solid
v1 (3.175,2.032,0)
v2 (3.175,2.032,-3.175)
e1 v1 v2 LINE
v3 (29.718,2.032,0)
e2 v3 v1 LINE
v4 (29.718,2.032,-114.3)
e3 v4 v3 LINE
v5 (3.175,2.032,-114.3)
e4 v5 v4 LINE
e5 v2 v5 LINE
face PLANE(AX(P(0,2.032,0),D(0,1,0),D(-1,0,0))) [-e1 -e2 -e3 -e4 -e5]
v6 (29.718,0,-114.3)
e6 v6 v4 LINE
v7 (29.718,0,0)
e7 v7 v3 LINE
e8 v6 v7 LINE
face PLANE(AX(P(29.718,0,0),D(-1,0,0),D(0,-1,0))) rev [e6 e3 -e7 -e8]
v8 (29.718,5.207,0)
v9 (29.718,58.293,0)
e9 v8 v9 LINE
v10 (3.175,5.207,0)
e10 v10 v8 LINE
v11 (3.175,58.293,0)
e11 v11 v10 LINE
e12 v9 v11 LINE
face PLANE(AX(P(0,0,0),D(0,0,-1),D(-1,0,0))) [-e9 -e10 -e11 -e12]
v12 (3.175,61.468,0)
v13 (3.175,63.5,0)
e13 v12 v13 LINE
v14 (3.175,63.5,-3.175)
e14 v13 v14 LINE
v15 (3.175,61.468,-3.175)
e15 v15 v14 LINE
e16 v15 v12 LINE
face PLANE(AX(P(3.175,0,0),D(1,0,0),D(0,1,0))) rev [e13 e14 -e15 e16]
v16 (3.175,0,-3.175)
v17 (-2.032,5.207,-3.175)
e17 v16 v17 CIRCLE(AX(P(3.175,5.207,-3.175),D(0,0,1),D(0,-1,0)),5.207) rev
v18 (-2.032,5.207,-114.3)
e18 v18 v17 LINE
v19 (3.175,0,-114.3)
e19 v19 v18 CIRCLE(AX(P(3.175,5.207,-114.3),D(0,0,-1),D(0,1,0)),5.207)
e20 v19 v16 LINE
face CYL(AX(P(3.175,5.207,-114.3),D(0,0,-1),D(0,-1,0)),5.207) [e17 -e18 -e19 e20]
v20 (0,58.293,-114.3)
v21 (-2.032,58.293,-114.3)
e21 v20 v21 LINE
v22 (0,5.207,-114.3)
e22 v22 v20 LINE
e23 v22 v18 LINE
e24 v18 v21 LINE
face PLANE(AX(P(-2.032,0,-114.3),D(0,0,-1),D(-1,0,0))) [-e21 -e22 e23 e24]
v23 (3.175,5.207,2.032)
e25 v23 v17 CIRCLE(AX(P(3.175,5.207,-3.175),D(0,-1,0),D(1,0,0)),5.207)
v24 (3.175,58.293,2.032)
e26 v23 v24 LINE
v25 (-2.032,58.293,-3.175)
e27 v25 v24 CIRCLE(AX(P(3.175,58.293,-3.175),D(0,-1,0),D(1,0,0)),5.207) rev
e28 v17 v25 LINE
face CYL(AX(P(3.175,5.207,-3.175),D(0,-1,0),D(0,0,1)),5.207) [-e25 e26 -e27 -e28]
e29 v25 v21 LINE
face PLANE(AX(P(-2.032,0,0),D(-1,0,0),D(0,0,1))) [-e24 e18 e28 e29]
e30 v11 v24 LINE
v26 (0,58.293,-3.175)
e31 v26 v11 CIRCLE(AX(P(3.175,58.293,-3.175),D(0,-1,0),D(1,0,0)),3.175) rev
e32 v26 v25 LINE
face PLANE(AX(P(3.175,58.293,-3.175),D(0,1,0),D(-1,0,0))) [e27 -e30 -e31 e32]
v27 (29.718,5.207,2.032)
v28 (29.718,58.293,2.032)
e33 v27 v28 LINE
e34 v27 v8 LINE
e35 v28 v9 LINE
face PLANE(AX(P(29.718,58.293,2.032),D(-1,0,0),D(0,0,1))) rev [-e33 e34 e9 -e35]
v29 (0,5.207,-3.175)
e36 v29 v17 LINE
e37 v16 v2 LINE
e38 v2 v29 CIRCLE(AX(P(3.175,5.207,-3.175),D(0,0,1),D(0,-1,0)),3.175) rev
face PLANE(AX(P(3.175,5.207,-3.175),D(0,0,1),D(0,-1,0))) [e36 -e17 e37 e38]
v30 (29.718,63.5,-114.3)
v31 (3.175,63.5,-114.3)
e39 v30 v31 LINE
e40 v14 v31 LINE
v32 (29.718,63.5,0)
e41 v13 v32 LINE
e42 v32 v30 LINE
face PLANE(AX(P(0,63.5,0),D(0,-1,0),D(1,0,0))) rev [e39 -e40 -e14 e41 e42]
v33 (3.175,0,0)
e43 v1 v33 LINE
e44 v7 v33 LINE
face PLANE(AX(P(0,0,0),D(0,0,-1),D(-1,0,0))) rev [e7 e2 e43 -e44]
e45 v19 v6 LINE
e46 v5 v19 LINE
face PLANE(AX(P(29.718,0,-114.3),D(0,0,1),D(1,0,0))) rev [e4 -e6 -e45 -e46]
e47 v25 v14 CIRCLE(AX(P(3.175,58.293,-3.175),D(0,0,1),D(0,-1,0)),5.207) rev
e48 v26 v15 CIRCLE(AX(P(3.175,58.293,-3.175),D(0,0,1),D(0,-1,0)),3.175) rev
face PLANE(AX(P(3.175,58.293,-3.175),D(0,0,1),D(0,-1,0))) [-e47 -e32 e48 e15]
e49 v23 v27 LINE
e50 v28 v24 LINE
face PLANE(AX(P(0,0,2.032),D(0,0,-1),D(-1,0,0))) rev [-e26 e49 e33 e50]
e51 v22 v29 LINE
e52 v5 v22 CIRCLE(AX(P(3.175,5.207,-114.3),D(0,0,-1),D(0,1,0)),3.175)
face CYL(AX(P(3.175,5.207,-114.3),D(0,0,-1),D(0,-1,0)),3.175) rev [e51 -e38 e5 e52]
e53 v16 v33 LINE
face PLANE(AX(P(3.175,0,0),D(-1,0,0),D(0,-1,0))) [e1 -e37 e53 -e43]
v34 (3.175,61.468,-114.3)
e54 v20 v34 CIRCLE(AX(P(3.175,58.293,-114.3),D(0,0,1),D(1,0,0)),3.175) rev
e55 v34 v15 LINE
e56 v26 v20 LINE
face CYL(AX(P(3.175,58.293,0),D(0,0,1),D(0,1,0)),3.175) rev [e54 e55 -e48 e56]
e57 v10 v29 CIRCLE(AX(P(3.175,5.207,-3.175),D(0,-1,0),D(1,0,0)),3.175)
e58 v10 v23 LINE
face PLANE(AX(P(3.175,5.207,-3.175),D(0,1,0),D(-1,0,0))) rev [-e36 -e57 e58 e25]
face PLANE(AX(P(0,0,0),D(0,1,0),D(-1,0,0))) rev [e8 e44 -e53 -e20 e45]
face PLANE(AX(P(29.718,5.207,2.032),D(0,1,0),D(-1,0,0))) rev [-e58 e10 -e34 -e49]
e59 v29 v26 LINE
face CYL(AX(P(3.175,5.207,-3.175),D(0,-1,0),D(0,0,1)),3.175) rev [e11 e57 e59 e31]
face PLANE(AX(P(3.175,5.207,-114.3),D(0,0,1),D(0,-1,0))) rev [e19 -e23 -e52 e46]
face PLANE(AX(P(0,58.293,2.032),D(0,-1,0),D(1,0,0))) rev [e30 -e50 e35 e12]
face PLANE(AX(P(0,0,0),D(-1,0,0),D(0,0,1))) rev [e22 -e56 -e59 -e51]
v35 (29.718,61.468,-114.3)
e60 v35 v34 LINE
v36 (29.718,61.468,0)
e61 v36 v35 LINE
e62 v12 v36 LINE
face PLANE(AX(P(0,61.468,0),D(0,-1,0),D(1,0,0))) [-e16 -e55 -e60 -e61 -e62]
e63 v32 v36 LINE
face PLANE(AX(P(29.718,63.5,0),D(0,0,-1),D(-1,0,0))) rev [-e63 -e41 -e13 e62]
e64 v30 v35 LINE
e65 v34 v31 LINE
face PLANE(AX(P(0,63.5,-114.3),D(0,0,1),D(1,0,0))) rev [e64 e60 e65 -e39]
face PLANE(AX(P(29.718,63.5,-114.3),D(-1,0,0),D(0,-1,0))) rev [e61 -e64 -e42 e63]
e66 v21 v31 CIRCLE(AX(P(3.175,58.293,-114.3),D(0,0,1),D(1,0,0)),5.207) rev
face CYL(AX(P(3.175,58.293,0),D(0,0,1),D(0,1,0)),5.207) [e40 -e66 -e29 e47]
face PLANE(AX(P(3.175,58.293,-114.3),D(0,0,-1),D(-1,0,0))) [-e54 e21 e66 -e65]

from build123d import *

# Parameters (mm, degrees)
SKETCH1_W                      = 114.3
SKETCH1_H                      = 63.5
BASE_FLANGE1_DEPTH             = 2.032
EDGE_FLANGE1_STRIP_W           = 14.478
EDGE_FLANGE1_STRIP_H           = 2.032
EDGE_FLANGE1_STRIP_CUT_DEPTH   = 114.3
EDGE_FLANGE1_STRIP_2_W         = 14.478
EDGE_FLANGE1_STRIP_2_H         = 2.032
EDGE_FLANGE1_STRIP_CUT_2_DEPTH = 114.3
EDGE_FLANGE1_DEPTH             = 114.3
EDGE_FLANGE1_BEND_DEPTH        = 114.3
EDGE_FLANGE2_DEPTH             = 63.5
EDGE_FLANGE2_2_DEPTH           = 5.207
EDGE_FLANGE2_START             = 58.293
EDGE_FLANGE2_3_DEPTH           = 5.207
EDGE_FLANGE2_START_2           = 5.207
EDGE_FLANGE2_4_DEPTH           = 53.086


# Read off the part's stored shape, not the designer's step: Edge-Flange2
# Sheet-metal steps are written as plain solids
with BuildPart() as part:
    # Sketch1 → Base-Flange1 (new body)
    with BuildSketch(Plane(origin=(0, 0, 0), x_dir=(0, 0, -1), z_dir=(1, 0, 0))):
        with Locations((57.15, 31.75)):
            Rectangle(SKETCH1_W, SKETCH1_H)
    extrude(amount=-BASE_FLANGE1_DEPTH)

    # Edge-Flange1 strip (across the edge) → Edge-Flange1 strip cut (cut)
    with BuildSketch(Plane(origin=(0, 63.5, -114.3), x_dir=(0, -1, 0), z_dir=(0, 0, 1))):
        with Locations((-2.032, -1.016)):
            Rectangle(EDGE_FLANGE1_STRIP_W, EDGE_FLANGE1_STRIP_H)
    extrude(amount=EDGE_FLANGE1_STRIP_CUT_DEPTH, mode=Mode.SUBTRACT)

    # Edge-Flange1 strip 2 (across the edge) → Edge-Flange1 strip cut 2 (cut)
    with BuildSketch(Plane.YX):
        with Locations((-2.032, -1.016)):
            Rectangle(EDGE_FLANGE1_STRIP_2_W, EDGE_FLANGE1_STRIP_2_H)
    extrude(amount=EDGE_FLANGE1_STRIP_CUT_2_DEPTH, mode=Mode.SUBTRACT)

    # Edge-Flange1 section (across the edge) → Edge-Flange1 (add)
    with BuildSketch(Plane(origin=(0, 63.5, -114.3), x_dir=(0, -1, 0), z_dir=(0, 0, 1))):
        with BuildLine():
            Line((0, 3.175), (0, 29.718))
            Line((0, 29.718), (2.032, 29.718))
            Line((2.032, 29.718), (2.032, 3.175))
            ThreePointArc((2.032, 3.175), (2.96193597, 0.92993597), (5.207, 0))
            Line((5.207, 0), (5.207, -2.032))
            ThreePointArc((5.207, -2.032), (1.52509499, -0.50690501), (0, 3.175))
        make_face()
    extrude(amount=EDGE_FLANGE1_DEPTH)

    # Edge-Flange1 section 2 (across the edge) → Edge-Flange1 bend (add)
    with BuildSketch(Plane.YX):
        with BuildLine():
            Line((0, 3.175), (0, 29.718))
            Line((0, 29.718), (2.032, 29.718))
            Line((2.032, 29.718), (2.032, 3.175))
            ThreePointArc((2.032, 3.175), (2.96193597, 0.92993597), (5.207, 0))
            Line((5.207, 0), (5.207, -2.032))
            ThreePointArc((5.207, -2.032), (1.52509499, -0.50690501), (0, 3.175))
        make_face()
    extrude(amount=EDGE_FLANGE1_BEND_DEPTH)

    # Edge-Flange2 outline → Edge-Flange2 (cut)
    with BuildSketch(Plane(origin=(0, 0, 0), x_dir=(1, 0, 0), z_dir=(0, 1, 0))):
        with BuildLine():
            Line((3.175, 0), (3.175, 3.175))
            Line((3.175, 3.175), (0, 3.175))
            ThreePointArc((0, 3.175), (0.92993597, 0.92993597), (3.175, 0))
        make_face()
        with BuildLine():
            ThreePointArc((-0.95201151, 0), (-1.754614485, 1.498172628), (-2.032, 3.175))
            Line((-2.032, 3.175), (-2.032, 0))
            Line((-2.032, 0), (-0.95201151, 0))
        make_face()
    extrude(amount=EDGE_FLANGE2_DEPTH, mode=Mode.SUBTRACT)

    # Edge-Flange2 2 outline → Edge-Flange2 2 (cut)
    with BuildSketch(Plane(origin=(0, 0, 0), x_dir=(1, 0, 0), z_dir=(0, 1, 0))):
        with BuildLine():
            ThreePointArc((3.175, 0), (0.92993597, 0.92993597), (0, 3.175))
            Line((0, 3.175), (-2.032, 3.175))
            ThreePointArc((-2.032, 3.175), (-1.754614485, 1.498172628), (-0.95201151, 0))
            Line((-0.95201151, 0), (3.175, 0))
        make_face()
    extrude(amount=EDGE_FLANGE2_2_DEPTH, mode=Mode.SUBTRACT)

    # Edge-Flange2 3 outline → Edge-Flange2 3 (cut)
    with BuildSketch(Plane(origin=(0, 0, 0), x_dir=(1, 0, 0), z_dir=(0, 1, 0)).offset(EDGE_FLANGE2_START)):
        with BuildLine():
            ThreePointArc((3.175, 0), (0.92993597, 0.92993597), (0, 3.175))
            Line((0, 3.175), (-2.032, 3.175))
            ThreePointArc((-2.032, 3.175), (-1.754614485, 1.498172628), (-0.95201151, 0))
            Line((-0.95201151, 0), (3.175, 0))
        make_face()
    extrude(amount=EDGE_FLANGE2_3_DEPTH, mode=Mode.SUBTRACT)

    # Edge-Flange2 4 outline → Edge-Flange2 4 (add)
    with BuildSketch(Plane(origin=(0, 0, 0), x_dir=(1, 0, 0), z_dir=(0, 1, 0)).offset(EDGE_FLANGE2_START_2)):
        with BuildLine():
            Line((0, 3.175), (0, 0))
            Line((0, 0), (-0.95201151, 0))
            ThreePointArc((-0.95201151, 0), (0.874932175, -1.496459836), (3.175, -2.032))
            Line((3.175, -2.032), (29.718, -2.032))
            Line((29.718, -2.032), (29.718, 0))
            Line((29.718, 0), (3.175, 0))
            ThreePointArc((3.175, 0), (0.92993597, 0.92993597), (0, 3.175))
        make_face()
    extrude(amount=EDGE_FLANGE2_4_DEPTH)


solid = part.part
